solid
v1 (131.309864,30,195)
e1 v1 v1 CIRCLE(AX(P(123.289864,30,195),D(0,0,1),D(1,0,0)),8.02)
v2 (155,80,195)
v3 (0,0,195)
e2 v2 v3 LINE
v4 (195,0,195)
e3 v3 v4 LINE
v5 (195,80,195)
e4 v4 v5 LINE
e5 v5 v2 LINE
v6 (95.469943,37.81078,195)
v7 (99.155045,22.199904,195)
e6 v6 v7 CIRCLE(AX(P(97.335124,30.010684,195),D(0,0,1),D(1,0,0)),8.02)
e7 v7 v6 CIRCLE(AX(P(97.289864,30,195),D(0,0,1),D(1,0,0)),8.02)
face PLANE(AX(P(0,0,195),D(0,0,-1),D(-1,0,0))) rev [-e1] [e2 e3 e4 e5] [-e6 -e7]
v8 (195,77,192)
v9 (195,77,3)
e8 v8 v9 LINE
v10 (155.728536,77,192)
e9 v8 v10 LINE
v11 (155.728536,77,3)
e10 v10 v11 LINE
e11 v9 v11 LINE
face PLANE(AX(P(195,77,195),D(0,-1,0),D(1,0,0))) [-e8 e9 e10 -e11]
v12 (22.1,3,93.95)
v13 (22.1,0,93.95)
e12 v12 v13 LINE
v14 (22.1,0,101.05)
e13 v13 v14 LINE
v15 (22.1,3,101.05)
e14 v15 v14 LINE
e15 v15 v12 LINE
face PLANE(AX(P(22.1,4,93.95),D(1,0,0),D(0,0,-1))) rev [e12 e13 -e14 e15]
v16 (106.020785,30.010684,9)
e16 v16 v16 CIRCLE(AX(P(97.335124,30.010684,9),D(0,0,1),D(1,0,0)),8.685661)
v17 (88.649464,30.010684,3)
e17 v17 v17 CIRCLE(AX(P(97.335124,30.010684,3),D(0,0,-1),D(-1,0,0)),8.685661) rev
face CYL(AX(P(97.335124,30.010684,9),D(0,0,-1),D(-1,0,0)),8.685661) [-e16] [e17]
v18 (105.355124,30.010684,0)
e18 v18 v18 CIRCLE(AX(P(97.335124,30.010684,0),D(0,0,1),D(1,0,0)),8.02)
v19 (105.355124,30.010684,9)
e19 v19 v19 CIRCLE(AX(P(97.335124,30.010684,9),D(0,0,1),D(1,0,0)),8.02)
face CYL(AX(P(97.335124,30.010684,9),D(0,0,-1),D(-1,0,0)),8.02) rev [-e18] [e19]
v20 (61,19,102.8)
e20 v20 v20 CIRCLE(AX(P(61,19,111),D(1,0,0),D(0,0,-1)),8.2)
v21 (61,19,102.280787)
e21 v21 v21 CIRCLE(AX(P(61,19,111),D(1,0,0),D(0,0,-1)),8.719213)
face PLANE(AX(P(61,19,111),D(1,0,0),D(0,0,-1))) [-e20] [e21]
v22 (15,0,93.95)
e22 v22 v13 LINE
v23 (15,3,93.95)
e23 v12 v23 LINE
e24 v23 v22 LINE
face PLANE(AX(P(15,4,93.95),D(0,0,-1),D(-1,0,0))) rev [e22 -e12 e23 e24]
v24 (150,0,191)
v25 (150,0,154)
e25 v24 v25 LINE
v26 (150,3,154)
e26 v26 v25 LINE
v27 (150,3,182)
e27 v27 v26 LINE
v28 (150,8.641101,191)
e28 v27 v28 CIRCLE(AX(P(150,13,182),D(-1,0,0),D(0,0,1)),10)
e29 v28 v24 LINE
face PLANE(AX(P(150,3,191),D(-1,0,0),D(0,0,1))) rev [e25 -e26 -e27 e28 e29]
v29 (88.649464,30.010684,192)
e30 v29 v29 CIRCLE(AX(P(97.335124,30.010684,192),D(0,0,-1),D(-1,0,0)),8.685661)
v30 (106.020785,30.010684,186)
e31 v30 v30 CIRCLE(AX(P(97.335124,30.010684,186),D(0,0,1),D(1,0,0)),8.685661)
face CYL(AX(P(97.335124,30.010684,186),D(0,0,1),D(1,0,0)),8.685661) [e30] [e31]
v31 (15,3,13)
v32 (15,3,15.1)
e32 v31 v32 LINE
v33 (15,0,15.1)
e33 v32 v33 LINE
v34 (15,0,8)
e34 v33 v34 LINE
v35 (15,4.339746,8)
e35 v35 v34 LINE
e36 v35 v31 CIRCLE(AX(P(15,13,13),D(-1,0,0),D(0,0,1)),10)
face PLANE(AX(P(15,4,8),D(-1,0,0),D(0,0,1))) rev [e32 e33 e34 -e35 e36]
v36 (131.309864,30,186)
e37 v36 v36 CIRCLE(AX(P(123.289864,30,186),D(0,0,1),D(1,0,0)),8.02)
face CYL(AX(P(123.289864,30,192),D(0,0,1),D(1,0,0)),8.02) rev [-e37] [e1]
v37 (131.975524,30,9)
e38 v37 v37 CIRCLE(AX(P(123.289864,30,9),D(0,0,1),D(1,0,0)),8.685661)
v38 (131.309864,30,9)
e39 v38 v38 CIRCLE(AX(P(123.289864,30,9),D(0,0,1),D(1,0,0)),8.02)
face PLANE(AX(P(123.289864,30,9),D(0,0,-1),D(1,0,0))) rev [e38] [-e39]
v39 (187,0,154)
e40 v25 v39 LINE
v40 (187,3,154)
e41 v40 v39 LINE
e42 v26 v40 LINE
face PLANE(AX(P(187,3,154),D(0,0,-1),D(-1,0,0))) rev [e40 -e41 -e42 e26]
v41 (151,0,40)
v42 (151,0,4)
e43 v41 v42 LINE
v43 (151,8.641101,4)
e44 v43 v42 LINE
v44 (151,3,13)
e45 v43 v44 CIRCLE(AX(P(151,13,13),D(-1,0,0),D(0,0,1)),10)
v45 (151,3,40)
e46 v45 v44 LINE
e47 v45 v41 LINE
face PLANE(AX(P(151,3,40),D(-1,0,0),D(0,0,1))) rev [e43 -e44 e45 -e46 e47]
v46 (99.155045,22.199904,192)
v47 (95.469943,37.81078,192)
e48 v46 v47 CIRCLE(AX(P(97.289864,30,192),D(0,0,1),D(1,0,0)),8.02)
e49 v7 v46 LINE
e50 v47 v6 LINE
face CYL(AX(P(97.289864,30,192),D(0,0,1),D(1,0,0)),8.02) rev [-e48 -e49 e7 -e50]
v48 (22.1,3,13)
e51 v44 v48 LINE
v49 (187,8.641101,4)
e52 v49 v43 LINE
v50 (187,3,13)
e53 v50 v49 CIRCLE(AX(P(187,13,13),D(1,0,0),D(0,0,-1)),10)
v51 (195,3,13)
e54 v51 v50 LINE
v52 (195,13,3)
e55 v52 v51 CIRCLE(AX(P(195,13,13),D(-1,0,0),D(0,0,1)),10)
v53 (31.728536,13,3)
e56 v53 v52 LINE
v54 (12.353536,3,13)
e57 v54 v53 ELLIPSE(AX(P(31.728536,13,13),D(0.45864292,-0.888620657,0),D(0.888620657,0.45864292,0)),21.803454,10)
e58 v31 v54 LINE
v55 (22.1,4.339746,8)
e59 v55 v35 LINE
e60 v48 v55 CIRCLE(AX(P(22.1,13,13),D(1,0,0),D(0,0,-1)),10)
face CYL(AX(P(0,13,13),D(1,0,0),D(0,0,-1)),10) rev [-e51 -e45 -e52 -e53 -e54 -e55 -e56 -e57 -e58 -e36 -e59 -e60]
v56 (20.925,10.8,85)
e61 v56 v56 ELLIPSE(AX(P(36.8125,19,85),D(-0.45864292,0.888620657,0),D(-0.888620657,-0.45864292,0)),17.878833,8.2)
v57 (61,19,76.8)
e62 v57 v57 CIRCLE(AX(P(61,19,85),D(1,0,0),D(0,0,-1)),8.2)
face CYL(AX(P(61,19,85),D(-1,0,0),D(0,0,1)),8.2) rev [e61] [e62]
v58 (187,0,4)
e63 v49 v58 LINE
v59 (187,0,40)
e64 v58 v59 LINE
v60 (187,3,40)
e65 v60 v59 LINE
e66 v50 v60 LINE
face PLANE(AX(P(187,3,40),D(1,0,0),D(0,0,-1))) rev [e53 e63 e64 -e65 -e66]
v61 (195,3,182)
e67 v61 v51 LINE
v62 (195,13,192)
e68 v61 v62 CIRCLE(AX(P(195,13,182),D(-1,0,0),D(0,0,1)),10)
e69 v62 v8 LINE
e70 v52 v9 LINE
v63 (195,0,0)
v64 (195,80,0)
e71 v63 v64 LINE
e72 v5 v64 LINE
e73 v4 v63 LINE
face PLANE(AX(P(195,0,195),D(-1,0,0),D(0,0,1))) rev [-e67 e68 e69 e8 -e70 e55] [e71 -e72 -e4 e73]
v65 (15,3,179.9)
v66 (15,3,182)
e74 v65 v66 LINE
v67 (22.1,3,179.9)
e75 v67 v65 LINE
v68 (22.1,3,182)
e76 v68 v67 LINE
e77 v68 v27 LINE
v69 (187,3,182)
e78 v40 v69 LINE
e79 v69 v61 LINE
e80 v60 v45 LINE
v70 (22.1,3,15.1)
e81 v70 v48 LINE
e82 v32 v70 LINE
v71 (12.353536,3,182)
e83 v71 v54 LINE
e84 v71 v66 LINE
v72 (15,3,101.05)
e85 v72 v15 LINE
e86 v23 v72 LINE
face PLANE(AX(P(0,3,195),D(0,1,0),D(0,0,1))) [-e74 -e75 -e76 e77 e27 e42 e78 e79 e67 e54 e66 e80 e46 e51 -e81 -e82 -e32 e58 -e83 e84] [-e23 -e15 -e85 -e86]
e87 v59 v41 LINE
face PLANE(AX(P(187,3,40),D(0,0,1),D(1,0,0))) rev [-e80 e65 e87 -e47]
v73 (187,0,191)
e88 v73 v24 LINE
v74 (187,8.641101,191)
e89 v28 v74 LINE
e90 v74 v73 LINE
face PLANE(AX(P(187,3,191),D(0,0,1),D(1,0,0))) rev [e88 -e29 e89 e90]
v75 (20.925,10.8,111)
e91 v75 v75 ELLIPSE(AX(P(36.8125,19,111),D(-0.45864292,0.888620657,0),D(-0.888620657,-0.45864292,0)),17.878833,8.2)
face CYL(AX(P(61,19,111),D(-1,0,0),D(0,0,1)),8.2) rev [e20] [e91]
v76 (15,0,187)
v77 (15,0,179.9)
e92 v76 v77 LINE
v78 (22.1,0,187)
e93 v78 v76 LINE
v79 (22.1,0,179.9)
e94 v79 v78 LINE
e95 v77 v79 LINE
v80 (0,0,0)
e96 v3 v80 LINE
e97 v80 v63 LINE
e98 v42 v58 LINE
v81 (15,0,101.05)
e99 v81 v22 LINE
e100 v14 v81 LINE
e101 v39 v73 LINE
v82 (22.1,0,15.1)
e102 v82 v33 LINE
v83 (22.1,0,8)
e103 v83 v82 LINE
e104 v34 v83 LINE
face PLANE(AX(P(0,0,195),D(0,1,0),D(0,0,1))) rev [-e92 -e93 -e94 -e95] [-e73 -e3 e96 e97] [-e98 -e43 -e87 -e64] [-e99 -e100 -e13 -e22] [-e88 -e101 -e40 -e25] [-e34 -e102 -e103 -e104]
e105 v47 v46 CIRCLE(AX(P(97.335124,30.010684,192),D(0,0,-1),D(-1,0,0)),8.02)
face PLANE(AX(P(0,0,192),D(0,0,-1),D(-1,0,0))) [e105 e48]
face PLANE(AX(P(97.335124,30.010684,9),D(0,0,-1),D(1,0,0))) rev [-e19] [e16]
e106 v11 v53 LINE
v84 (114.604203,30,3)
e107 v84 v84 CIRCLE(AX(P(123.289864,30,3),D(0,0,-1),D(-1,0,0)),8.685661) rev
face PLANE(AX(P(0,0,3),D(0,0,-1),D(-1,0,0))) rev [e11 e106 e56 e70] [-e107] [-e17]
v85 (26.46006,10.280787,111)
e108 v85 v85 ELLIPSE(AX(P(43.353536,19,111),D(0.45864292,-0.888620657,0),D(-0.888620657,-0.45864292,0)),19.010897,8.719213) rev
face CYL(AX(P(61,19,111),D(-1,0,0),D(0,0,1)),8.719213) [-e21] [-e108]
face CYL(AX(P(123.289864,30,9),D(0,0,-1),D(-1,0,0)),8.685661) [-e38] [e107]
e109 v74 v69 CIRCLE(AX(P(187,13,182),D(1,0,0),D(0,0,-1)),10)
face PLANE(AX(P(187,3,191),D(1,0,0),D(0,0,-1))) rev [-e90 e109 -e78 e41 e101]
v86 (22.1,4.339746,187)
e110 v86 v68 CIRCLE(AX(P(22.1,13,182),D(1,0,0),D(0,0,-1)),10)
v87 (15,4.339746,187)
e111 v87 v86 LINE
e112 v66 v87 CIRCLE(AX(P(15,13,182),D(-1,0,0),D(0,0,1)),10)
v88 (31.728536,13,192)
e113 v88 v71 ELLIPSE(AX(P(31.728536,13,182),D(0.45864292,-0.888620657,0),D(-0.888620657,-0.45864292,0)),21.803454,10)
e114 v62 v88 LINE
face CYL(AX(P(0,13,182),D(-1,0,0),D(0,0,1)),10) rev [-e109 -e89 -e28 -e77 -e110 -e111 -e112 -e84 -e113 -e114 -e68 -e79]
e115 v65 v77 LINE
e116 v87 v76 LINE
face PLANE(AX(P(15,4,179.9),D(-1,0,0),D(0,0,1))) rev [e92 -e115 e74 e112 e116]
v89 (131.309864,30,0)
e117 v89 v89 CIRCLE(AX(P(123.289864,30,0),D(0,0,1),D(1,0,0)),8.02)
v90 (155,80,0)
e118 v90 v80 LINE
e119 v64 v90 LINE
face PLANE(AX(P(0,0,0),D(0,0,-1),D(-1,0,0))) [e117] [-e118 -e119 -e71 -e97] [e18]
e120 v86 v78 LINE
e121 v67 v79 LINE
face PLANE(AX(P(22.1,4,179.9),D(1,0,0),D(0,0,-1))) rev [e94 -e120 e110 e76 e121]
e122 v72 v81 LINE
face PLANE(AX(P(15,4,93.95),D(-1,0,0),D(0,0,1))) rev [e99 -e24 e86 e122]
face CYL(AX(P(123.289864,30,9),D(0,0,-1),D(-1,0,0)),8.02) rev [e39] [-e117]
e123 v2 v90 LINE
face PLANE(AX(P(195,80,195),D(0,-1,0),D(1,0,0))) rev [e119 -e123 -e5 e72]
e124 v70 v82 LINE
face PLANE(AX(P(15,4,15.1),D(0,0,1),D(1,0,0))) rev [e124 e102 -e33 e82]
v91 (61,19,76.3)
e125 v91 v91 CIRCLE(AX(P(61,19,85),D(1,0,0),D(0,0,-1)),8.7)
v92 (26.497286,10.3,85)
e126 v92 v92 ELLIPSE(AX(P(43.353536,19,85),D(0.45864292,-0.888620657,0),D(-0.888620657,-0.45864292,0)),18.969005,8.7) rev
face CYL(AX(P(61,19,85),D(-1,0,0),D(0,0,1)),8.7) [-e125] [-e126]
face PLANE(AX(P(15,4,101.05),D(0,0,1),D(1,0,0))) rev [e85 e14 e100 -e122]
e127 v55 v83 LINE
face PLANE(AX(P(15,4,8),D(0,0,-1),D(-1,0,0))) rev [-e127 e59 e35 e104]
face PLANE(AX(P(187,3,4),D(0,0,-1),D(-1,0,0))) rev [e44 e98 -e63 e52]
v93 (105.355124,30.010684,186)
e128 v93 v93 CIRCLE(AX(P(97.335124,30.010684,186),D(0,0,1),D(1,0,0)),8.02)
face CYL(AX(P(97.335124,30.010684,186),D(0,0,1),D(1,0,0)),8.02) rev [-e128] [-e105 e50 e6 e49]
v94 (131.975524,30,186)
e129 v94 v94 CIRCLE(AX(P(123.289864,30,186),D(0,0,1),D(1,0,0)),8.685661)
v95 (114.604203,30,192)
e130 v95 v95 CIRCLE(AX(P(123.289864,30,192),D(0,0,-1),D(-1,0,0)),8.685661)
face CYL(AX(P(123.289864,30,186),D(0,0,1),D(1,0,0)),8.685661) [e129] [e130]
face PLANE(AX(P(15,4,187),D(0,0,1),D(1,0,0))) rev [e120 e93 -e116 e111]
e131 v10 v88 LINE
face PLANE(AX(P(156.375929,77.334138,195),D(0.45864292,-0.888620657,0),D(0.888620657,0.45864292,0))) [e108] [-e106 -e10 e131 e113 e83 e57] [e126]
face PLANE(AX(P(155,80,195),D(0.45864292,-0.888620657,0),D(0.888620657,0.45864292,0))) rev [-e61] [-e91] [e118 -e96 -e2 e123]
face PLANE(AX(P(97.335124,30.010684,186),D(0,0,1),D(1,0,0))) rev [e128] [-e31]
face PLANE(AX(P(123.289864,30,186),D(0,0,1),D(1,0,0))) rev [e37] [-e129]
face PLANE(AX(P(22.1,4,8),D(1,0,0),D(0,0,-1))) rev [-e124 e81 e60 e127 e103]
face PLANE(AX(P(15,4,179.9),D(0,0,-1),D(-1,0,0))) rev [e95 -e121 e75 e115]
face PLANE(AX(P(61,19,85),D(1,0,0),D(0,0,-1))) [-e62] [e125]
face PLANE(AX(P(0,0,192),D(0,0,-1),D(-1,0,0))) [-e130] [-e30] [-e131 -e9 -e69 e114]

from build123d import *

# Parameters (mm, degrees)
ROBOT_DEPTH                 = 195
VACIO_POR_DENTRO_3MM_T      = -3
SKETCH3_R                   = 8.02
ULTRASONICO_DERECHA_DEPTH   = 3
SKETCH9_R                   = 8.2
ULTRASONICO_IZQUIERDA_DEPTH = 3
SKETCH10_W                  = 37
SKETCH10_H                  = 37
RUEDA_DERECHA_DEPTH         = 3
SKETCH12_W                  = 36
SKETCH12_H                  = 36
RUEDA_IZQUIERDA_DEPTH       = 3
SKETCH14_W                  = 7.1
SKETCH14_H                  = 7.1
CYN70_DERECHA_DEPTH         = 4
SKETCH15_W                  = 7.1
SKETCH15_H                  = 7.1
CNY70_CENTRO_DEPTH          = 4
SKETCH13_W                  = 7.1
SKETCH13_H                  = 7.1
CNY70_IZQUIERDA_DEPTH       = 4
ULTRASONICO_CENTRO_R        = 8.7
CUT_EXTRUDE4_DEPTH          = 75
FILLET2_R                   = 10
SKETCH16_R                  = 8.685660505
SKETCH16_R_2                = 8.02
BOSS_EXTRUDE1_DEPTH         = 9
SKETCH18_R                  = 8.7
SKETCH18_R_2                = 8.2
SKETCH18_R_3                = 8.719213476
BOSS_EXTRUDE2_DEPTH         = 60
SKETCH23_W                  = 76.592532913
SKETCH23_H                  = 65.967934853
CUT_EXTRUDE5_DEPTH          = 25


with BuildPart() as part:
    # Sketch2 → Robot (new body)
    with BuildSketch(Plane.XY):
        Polygon((0, 0), (195, 0), (195, 80), (155, 80), align=None)
    extrude(amount=ROBOT_DEPTH)

    # Vacio por dentro 3mm
    vacio_por_dentro_3mm_openings = [part.faces().sort_by_distance(p)[0] for p in [
        (195, 40, 97.5),
    ]]
    offset(amount=VACIO_POR_DENTRO_3MM_T, openings=vacio_por_dentro_3mm_openings, kind=Kind.INTERSECTION)

    # Sketch3 → Ultrasonico Derecha (cut)
    with BuildSketch(Plane.XY.offset(195)):
        with Locations((97.289863967, 30)):
            Circle(SKETCH3_R)
        with Locations((123.289863967, 30)):
            Circle(SKETCH3_R)
    extrude(amount=-ULTRASONICO_DERECHA_DEPTH, mode=Mode.SUBTRACT)

    # Sketch9 → Ultrasonico Izquierda (cut)
    with BuildSketch(Plane(origin=(0, 0, 0), x_dir=(-1, 0, 0), z_dir=(0, 0, -1))):
        with Locations((-97.284004153, 30)):
            Circle(SKETCH9_R)
        with Locations((-123.284004153, 30)):
            Circle(SKETCH9_R)
    extrude(amount=-ULTRASONICO_IZQUIERDA_DEPTH, mode=Mode.SUBTRACT)

    # Sketch10 → Rueda Derecha (cut)
    with BuildSketch(Plane(origin=(0, 0, 0), x_dir=(-1, 0, 0), z_dir=(0, -1, 0))):
        with Locations((-168.5, -172.5)):
            Rectangle(SKETCH10_W, SKETCH10_H)
    extrude(amount=-RUEDA_DERECHA_DEPTH, mode=Mode.SUBTRACT)

    # Sketch12 → Rueda Izquierda (cut)
    with BuildSketch(Plane(origin=(0, 0, 0), x_dir=(-1, 0, 0), z_dir=(0, -1, 0))):
        with Locations((-169, -22)):
            Rectangle(SKETCH12_W, SKETCH12_H)
    extrude(amount=-RUEDA_IZQUIERDA_DEPTH, mode=Mode.SUBTRACT)

    # Sketch14 → Cyn70 Derecha (cut)
    with BuildSketch(Plane(origin=(0, 0, 0), x_dir=(-1, 0, 0), z_dir=(0, -1, 0))):
        with Locations((-18.55, -183.45)):
            Rectangle(SKETCH14_W, SKETCH14_H)
    extrude(amount=-CYN70_DERECHA_DEPTH, mode=Mode.SUBTRACT)

    # Sketch15 → Cny70 Centro (cut)
    with BuildSketch(Plane(origin=(0, 0, 0), x_dir=(-1, 0, 0), z_dir=(0, -1, 0))):
        with Locations((-18.55, -97.5)):
            Rectangle(SKETCH15_W, SKETCH15_H)
    extrude(amount=-CNY70_CENTRO_DEPTH, mode=Mode.SUBTRACT)

    # Sketch13 → Cny70 Izquierda (cut)
    with BuildSketch(Plane.XZ):
        with Locations((18.55, 11.55)):
            Rectangle(SKETCH13_W, SKETCH13_H)
    extrude(amount=-CNY70_IZQUIERDA_DEPTH, mode=Mode.SUBTRACT)

    # Ultrasonico Centro → Cut-Extrude4 (cut)
    with BuildSketch(Plane(origin=(0, 0, 0), x_dir=(0, 0, -1), z_dir=(1, 0, 0))):
        with Locations(Location((-85, 19, 0), (0, 0, 270))):
            Circle(ULTRASONICO_CENTRO_R)
        with Locations(Location((-111, 19, 0), (0, 0, 270))):
            Circle(ULTRASONICO_CENTRO_R)
    extrude(amount=CUT_EXTRUDE4_DEPTH, mode=Mode.SUBTRACT)

    # Fillet2
    # the kernel refuses this fillet: 10 mm, written as the material it adds along each edge
    with BuildSketch(Plane(origin=(-12.646463672, 3, 3), x_dir=(0, 0, 1), z_dir=(1, 0, 0))) as fillet2_piece_1_section:
        with BuildLine():
            CenterArc((FILLET2_R, -FILLET2_R), FILLET2_R, 90, 90)
            Line((0, -FILLET2_R), (0, 0))
            Line((0, 0), (FILLET2_R, 0))
        make_face()
    fillet2_piece_1 = extrude(amount=232.646463672, mode=Mode.PRIVATE)
    fillet2_piece_1 = split(fillet2_piece_1, bisect_by=Plane(origin=(15, 3.299966987, 9.404706068), z_dir=(-1, 0, 0)), keep=Keep.TOP, mode=Mode.PRIVATE)
    fillet2_piece_1 = split(fillet2_piece_1, bisect_by=Plane(origin=(13.75014217, 3.720828822, 9.404706068), z_dir=(0.4586429197702524, -0.8886206570548638, 0)), keep=Keep.TOP, mode=Mode.PRIVATE)
    add(fillet2_piece_1)
    with BuildSketch(Plane(origin=(-12.646463672, 3, 3), x_dir=(0, 0, 1), z_dir=(1, 0, 0))) as fillet2_piece_2_section:
        with BuildLine():
            CenterArc((FILLET2_R, -FILLET2_R), FILLET2_R, 90, 90)
            Line((0, -FILLET2_R), (0, 0))
            Line((0, 0), (FILLET2_R, 0))
        make_face()
    fillet2_piece_2 = extrude(amount=232.646463672, mode=Mode.PRIVATE)
    fillet2_piece_2 = split(fillet2_piece_2, bisect_by=Plane(origin=(18.935979347, 4.386521826, 8), z_dir=(0, 0, -1)), keep=Keep.TOP, mode=Mode.PRIVATE)
    fillet2_piece_2 = split(fillet2_piece_2, bisect_by=Plane(origin=(151, 4.386521826, 5.724112509), z_dir=(-1, 0, 0)), keep=Keep.TOP, mode=Mode.PRIVATE)
    fillet2_piece_2 = split(fillet2_piece_2, bisect_by=Plane(origin=(18.116430796, 5.974397144, 5.724112509), z_dir=(0.4586429197702524, -0.8886206570548638, 0)), keep=Keep.TOP, mode=Mode.PRIVATE)
    add(fillet2_piece_2)
    with BuildSketch(Plane(origin=(-12.646463672, 3, 3), x_dir=(0, 0, 1), z_dir=(1, 0, 0))) as fillet2_piece_3_section:
        with BuildLine():
            CenterArc((FILLET2_R, -FILLET2_R), FILLET2_R, 90, 90)
            Line((0, -FILLET2_R), (0, 0))
            Line((0, 0), (FILLET2_R, 0))
        make_face()
    fillet2_piece_3 = extrude(amount=232.646463672, mode=Mode.PRIVATE)
    fillet2_piece_3 = split(fillet2_piece_3, bisect_by=Plane(origin=(22.1, 3.396845927, 9.232636126), z_dir=(1, 0, 0)), keep=Keep.TOP, mode=Mode.PRIVATE)
    fillet2_piece_3 = split(fillet2_piece_3, bisect_by=Plane(origin=(151, 3.396845927, 9.232636126), z_dir=(-1, 0, 0)), keep=Keep.TOP, mode=Mode.PRIVATE)
    fillet2_piece_3 = split(fillet2_piece_3, bisect_by=Plane(origin=(71.104265308, 33.322956893, 9.232636126), z_dir=(0.4586429197702524, -0.8886206570548638, 0)), keep=Keep.TOP, mode=Mode.PRIVATE)
    add(fillet2_piece_3)
    with BuildSketch(Plane(origin=(-12.646463672, 3, 3), x_dir=(0, 0, 1), z_dir=(1, 0, 0))) as fillet2_piece_4_section:
        with BuildLine():
            CenterArc((FILLET2_R, -FILLET2_R), FILLET2_R, 90, 90)
            Line((0, -FILLET2_R), (0, 0))
            Line((0, 0), (FILLET2_R, 0))
        make_face()
    fillet2_piece_4 = extrude(amount=207.646463672, mode=Mode.PRIVATE)
    fillet2_piece_4 = split(fillet2_piece_4, bisect_by=Plane(origin=(187, 3.396845927, 9.232636126), z_dir=(1, 0, 0)), keep=Keep.TOP, mode=Mode.PRIVATE)
    add(fillet2_piece_4)
    with BuildSketch(Plane(origin=(-12.646463672, 3, 3), x_dir=(0, 0, 1), z_dir=(1, 0, 0))) as fillet2_piece_5_section:
        with BuildLine():
            CenterArc((FILLET2_R, -FILLET2_R), FILLET2_R, 90, 90)
            Line((0, -FILLET2_R), (0, 0))
            Line((0, 0), (FILLET2_R, 0))
        make_face()
    fillet2_piece_5 = extrude(amount=232.646463672, mode=Mode.PRIVATE)
    fillet2_piece_5 = split(fillet2_piece_5, bisect_by=Plane(origin=(187, 6.605810426, 3.459165083), z_dir=(-1, 0, 0)), keep=Keep.TOP, mode=Mode.PRIVATE)
    fillet2_piece_5 = split(fillet2_piece_5, bisect_by=Plane(origin=(169, 6.605810426, 4), z_dir=(0, 0, -1)), keep=Keep.TOP, mode=Mode.PRIVATE)
    fillet2_piece_5 = split(fillet2_piece_5, bisect_by=Plane(origin=(137.518477626, 67.601260025, 3.459165083), z_dir=(0.4586429197702524, -0.8886206570548638, 0)), keep=Keep.TOP, mode=Mode.PRIVATE)
    add(fillet2_piece_5)
    with BuildSketch(Plane(origin=(-12.646463672, 3, 192), x_dir=(0, 0, -1), z_dir=(1, 0, 0))) as fillet2_piece_6_section:
        with BuildLine():
            CenterArc((FILLET2_R, FILLET2_R), FILLET2_R, 180, 90)
            Line((0, FILLET2_R), (0, 0))
            Line((0, 0), (FILLET2_R, 0))
        make_face()
    fillet2_piece_6 = extrude(amount=232.646463672, mode=Mode.PRIVATE)
    fillet2_piece_6 = split(fillet2_piece_6, bisect_by=Plane(origin=(15, 3.299966987, 185.595293932), z_dir=(-1, 0, 0)), keep=Keep.TOP, mode=Mode.PRIVATE)
    fillet2_piece_6 = split(fillet2_piece_6, bisect_by=Plane(origin=(13.75014217, 3.720828822, 185.595293932), z_dir=(0.4586429197702524, -0.8886206570548638, 0)), keep=Keep.TOP, mode=Mode.PRIVATE)
    add(fillet2_piece_6)
    with BuildSketch(Plane(origin=(-12.646463672, 3, 192), x_dir=(0, 0, -1), z_dir=(1, 0, 0))) as fillet2_piece_7_section:
        with BuildLine():
            CenterArc((FILLET2_R, FILLET2_R), FILLET2_R, 180, 90)
            Line((0, FILLET2_R), (0, 0))
            Line((0, 0), (FILLET2_R, 0))
        make_face()
    fillet2_piece_7 = extrude(amount=232.646463672, mode=Mode.PRIVATE)
    fillet2_piece_7 = split(fillet2_piece_7, bisect_by=Plane(origin=(18.935979347, 4.386521826, 187), z_dir=(0, 0, 1)), keep=Keep.TOP, mode=Mode.PRIVATE)
    fillet2_piece_7 = split(fillet2_piece_7, bisect_by=Plane(origin=(150, 4.386521826, 189.275887491), z_dir=(-1, 0, 0)), keep=Keep.TOP, mode=Mode.PRIVATE)
    fillet2_piece_7 = split(fillet2_piece_7, bisect_by=Plane(origin=(18.116430796, 5.974397144, 189.275887491), z_dir=(0.4586429197702524, -0.8886206570548638, 0)), keep=Keep.TOP, mode=Mode.PRIVATE)
    add(fillet2_piece_7)
    with BuildSketch(Plane(origin=(-12.646463672, 3, 192), x_dir=(0, 0, -1), z_dir=(1, 0, 0))) as fillet2_piece_8_section:
        with BuildLine():
            CenterArc((FILLET2_R, FILLET2_R), FILLET2_R, 180, 90)
            Line((0, FILLET2_R), (0, 0))
            Line((0, 0), (FILLET2_R, 0))
        make_face()
    fillet2_piece_8 = extrude(amount=232.646463672, mode=Mode.PRIVATE)
    fillet2_piece_8 = split(fillet2_piece_8, bisect_by=Plane(origin=(22.1, 3.396845927, 185.767363874), z_dir=(1, 0, 0)), keep=Keep.TOP, mode=Mode.PRIVATE)
    fillet2_piece_8 = split(fillet2_piece_8, bisect_by=Plane(origin=(150, 3.396845927, 185.767363874), z_dir=(-1, 0, 0)), keep=Keep.TOP, mode=Mode.PRIVATE)
    fillet2_piece_8 = split(fillet2_piece_8, bisect_by=Plane(origin=(70.709441972, 33.119177106, 185.767363874), z_dir=(0.4586429197702524, -0.8886206570548638, 0)), keep=Keep.TOP, mode=Mode.PRIVATE)
    add(fillet2_piece_8)
    with BuildSketch(Plane(origin=(-12.646463672, 3, 192), x_dir=(0, 0, -1), z_dir=(1, 0, 0))) as fillet2_piece_9_section:
        with BuildLine():
            CenterArc((FILLET2_R, FILLET2_R), FILLET2_R, 180, 90)
            Line((0, FILLET2_R), (0, 0))
            Line((0, 0), (FILLET2_R, 0))
        make_face()
    fillet2_piece_9 = extrude(amount=207.646463672, mode=Mode.PRIVATE)
    fillet2_piece_9 = split(fillet2_piece_9, bisect_by=Plane(origin=(187, 3.396845927, 185.767363874), z_dir=(1, 0, 0)), keep=Keep.TOP, mode=Mode.PRIVATE)
    add(fillet2_piece_9)
    with BuildSketch(Plane(origin=(-12.646463672, 3, 192), x_dir=(0, 0, -1), z_dir=(1, 0, 0))) as fillet2_piece_10_section:
        with BuildLine():
            CenterArc((FILLET2_R, FILLET2_R), FILLET2_R, 180, 90)
            Line((0, FILLET2_R), (0, 0))
            Line((0, 0), (FILLET2_R, 0))
        make_face()
    fillet2_piece_10 = extrude(amount=232.646463672, mode=Mode.PRIVATE)
    fillet2_piece_10 = split(fillet2_piece_10, bisect_by=Plane(origin=(187, 6.605810426, 191.540834917), z_dir=(-1, 0, 0)), keep=Keep.TOP, mode=Mode.PRIVATE)
    fillet2_piece_10 = split(fillet2_piece_10, bisect_by=Plane(origin=(168.5, 6.605810426, 191), z_dir=(0, 0, 1)), keep=Keep.TOP, mode=Mode.PRIVATE)
    fillet2_piece_10 = split(fillet2_piece_10, bisect_by=Plane(origin=(137.12365429, 67.397480238, 191.540834917), z_dir=(0.4586429197702524, -0.8886206570548638, 0)), keep=Keep.TOP, mode=Mode.PRIVATE)
    add(fillet2_piece_10)

    # Sketch16 → Boss-Extrude1 (add)
    # profile 1 of 2: a face of its own
    with BuildSketch(Plane.XY.offset(195)):
        with Locations((123.289863967, 30)):
            Circle(SKETCH16_R)
        with Locations((123.289863967, 30)):
            Circle(SKETCH16_R_2, mode=Mode.SUBTRACT)
    # profile 2 of 2: a face of its own
    with BuildSketch(Plane.XY.offset(195)):
        with Locations((97.335124092, 30.010684101)):
            Circle(SKETCH16_R)
        with Locations((97.335124092, 30.010684101)):
            Circle(SKETCH16_R_2, mode=Mode.SUBTRACT)
    boss_extrude1 = extrude(amount=-BOSS_EXTRUDE1_DEPTH)

    # Mirror1: Boss-Extrude1 across plane
    add(boss_extrude1.mirror(Plane.XY.offset(97.5)))

    # Sketch18 → Boss-Extrude2 (add)
    # profile 1 of 2: a face of its own
    with BuildSketch(Plane(origin=(1, 0, 0), x_dir=(0, 0, -1), z_dir=(1, 0, 0))):
        with Locations(Location((-85, 19, 0), (0, 0, 270))):
            Circle(SKETCH18_R)
        with Locations((-85, 19)):
            Circle(SKETCH18_R_2, mode=Mode.SUBTRACT)
    # profile 2 of 2: a face of its own
    with BuildSketch(Plane(origin=(1, 0, 0), x_dir=(0, 0, -1), z_dir=(1, 0, 0))):
        with Locations(Location((-111, 19, 0), (0, 0, 270))):
            Circle(SKETCH18_R_3)
        with Locations((-111, 19)):
            Circle(SKETCH18_R_2, mode=Mode.SUBTRACT)
    extrude(amount=BOSS_EXTRUDE2_DEPTH)

    # Sketch23 → Cut-Extrude5 (cut)
    with BuildSketch(Plane(origin=(0, 0, 0), x_dir=(0.8886206570548638, 0.45864291977025234, 0), z_dir=(-0.4586429197702524, 0.8886206570548639, 0))):
        with Locations((38.296266456, -97.30278137)):
            Rectangle(SKETCH23_W, SKETCH23_H)
    extrude(amount=CUT_EXTRUDE5_DEPTH, mode=Mode.SUBTRACT)


solid = part.part
